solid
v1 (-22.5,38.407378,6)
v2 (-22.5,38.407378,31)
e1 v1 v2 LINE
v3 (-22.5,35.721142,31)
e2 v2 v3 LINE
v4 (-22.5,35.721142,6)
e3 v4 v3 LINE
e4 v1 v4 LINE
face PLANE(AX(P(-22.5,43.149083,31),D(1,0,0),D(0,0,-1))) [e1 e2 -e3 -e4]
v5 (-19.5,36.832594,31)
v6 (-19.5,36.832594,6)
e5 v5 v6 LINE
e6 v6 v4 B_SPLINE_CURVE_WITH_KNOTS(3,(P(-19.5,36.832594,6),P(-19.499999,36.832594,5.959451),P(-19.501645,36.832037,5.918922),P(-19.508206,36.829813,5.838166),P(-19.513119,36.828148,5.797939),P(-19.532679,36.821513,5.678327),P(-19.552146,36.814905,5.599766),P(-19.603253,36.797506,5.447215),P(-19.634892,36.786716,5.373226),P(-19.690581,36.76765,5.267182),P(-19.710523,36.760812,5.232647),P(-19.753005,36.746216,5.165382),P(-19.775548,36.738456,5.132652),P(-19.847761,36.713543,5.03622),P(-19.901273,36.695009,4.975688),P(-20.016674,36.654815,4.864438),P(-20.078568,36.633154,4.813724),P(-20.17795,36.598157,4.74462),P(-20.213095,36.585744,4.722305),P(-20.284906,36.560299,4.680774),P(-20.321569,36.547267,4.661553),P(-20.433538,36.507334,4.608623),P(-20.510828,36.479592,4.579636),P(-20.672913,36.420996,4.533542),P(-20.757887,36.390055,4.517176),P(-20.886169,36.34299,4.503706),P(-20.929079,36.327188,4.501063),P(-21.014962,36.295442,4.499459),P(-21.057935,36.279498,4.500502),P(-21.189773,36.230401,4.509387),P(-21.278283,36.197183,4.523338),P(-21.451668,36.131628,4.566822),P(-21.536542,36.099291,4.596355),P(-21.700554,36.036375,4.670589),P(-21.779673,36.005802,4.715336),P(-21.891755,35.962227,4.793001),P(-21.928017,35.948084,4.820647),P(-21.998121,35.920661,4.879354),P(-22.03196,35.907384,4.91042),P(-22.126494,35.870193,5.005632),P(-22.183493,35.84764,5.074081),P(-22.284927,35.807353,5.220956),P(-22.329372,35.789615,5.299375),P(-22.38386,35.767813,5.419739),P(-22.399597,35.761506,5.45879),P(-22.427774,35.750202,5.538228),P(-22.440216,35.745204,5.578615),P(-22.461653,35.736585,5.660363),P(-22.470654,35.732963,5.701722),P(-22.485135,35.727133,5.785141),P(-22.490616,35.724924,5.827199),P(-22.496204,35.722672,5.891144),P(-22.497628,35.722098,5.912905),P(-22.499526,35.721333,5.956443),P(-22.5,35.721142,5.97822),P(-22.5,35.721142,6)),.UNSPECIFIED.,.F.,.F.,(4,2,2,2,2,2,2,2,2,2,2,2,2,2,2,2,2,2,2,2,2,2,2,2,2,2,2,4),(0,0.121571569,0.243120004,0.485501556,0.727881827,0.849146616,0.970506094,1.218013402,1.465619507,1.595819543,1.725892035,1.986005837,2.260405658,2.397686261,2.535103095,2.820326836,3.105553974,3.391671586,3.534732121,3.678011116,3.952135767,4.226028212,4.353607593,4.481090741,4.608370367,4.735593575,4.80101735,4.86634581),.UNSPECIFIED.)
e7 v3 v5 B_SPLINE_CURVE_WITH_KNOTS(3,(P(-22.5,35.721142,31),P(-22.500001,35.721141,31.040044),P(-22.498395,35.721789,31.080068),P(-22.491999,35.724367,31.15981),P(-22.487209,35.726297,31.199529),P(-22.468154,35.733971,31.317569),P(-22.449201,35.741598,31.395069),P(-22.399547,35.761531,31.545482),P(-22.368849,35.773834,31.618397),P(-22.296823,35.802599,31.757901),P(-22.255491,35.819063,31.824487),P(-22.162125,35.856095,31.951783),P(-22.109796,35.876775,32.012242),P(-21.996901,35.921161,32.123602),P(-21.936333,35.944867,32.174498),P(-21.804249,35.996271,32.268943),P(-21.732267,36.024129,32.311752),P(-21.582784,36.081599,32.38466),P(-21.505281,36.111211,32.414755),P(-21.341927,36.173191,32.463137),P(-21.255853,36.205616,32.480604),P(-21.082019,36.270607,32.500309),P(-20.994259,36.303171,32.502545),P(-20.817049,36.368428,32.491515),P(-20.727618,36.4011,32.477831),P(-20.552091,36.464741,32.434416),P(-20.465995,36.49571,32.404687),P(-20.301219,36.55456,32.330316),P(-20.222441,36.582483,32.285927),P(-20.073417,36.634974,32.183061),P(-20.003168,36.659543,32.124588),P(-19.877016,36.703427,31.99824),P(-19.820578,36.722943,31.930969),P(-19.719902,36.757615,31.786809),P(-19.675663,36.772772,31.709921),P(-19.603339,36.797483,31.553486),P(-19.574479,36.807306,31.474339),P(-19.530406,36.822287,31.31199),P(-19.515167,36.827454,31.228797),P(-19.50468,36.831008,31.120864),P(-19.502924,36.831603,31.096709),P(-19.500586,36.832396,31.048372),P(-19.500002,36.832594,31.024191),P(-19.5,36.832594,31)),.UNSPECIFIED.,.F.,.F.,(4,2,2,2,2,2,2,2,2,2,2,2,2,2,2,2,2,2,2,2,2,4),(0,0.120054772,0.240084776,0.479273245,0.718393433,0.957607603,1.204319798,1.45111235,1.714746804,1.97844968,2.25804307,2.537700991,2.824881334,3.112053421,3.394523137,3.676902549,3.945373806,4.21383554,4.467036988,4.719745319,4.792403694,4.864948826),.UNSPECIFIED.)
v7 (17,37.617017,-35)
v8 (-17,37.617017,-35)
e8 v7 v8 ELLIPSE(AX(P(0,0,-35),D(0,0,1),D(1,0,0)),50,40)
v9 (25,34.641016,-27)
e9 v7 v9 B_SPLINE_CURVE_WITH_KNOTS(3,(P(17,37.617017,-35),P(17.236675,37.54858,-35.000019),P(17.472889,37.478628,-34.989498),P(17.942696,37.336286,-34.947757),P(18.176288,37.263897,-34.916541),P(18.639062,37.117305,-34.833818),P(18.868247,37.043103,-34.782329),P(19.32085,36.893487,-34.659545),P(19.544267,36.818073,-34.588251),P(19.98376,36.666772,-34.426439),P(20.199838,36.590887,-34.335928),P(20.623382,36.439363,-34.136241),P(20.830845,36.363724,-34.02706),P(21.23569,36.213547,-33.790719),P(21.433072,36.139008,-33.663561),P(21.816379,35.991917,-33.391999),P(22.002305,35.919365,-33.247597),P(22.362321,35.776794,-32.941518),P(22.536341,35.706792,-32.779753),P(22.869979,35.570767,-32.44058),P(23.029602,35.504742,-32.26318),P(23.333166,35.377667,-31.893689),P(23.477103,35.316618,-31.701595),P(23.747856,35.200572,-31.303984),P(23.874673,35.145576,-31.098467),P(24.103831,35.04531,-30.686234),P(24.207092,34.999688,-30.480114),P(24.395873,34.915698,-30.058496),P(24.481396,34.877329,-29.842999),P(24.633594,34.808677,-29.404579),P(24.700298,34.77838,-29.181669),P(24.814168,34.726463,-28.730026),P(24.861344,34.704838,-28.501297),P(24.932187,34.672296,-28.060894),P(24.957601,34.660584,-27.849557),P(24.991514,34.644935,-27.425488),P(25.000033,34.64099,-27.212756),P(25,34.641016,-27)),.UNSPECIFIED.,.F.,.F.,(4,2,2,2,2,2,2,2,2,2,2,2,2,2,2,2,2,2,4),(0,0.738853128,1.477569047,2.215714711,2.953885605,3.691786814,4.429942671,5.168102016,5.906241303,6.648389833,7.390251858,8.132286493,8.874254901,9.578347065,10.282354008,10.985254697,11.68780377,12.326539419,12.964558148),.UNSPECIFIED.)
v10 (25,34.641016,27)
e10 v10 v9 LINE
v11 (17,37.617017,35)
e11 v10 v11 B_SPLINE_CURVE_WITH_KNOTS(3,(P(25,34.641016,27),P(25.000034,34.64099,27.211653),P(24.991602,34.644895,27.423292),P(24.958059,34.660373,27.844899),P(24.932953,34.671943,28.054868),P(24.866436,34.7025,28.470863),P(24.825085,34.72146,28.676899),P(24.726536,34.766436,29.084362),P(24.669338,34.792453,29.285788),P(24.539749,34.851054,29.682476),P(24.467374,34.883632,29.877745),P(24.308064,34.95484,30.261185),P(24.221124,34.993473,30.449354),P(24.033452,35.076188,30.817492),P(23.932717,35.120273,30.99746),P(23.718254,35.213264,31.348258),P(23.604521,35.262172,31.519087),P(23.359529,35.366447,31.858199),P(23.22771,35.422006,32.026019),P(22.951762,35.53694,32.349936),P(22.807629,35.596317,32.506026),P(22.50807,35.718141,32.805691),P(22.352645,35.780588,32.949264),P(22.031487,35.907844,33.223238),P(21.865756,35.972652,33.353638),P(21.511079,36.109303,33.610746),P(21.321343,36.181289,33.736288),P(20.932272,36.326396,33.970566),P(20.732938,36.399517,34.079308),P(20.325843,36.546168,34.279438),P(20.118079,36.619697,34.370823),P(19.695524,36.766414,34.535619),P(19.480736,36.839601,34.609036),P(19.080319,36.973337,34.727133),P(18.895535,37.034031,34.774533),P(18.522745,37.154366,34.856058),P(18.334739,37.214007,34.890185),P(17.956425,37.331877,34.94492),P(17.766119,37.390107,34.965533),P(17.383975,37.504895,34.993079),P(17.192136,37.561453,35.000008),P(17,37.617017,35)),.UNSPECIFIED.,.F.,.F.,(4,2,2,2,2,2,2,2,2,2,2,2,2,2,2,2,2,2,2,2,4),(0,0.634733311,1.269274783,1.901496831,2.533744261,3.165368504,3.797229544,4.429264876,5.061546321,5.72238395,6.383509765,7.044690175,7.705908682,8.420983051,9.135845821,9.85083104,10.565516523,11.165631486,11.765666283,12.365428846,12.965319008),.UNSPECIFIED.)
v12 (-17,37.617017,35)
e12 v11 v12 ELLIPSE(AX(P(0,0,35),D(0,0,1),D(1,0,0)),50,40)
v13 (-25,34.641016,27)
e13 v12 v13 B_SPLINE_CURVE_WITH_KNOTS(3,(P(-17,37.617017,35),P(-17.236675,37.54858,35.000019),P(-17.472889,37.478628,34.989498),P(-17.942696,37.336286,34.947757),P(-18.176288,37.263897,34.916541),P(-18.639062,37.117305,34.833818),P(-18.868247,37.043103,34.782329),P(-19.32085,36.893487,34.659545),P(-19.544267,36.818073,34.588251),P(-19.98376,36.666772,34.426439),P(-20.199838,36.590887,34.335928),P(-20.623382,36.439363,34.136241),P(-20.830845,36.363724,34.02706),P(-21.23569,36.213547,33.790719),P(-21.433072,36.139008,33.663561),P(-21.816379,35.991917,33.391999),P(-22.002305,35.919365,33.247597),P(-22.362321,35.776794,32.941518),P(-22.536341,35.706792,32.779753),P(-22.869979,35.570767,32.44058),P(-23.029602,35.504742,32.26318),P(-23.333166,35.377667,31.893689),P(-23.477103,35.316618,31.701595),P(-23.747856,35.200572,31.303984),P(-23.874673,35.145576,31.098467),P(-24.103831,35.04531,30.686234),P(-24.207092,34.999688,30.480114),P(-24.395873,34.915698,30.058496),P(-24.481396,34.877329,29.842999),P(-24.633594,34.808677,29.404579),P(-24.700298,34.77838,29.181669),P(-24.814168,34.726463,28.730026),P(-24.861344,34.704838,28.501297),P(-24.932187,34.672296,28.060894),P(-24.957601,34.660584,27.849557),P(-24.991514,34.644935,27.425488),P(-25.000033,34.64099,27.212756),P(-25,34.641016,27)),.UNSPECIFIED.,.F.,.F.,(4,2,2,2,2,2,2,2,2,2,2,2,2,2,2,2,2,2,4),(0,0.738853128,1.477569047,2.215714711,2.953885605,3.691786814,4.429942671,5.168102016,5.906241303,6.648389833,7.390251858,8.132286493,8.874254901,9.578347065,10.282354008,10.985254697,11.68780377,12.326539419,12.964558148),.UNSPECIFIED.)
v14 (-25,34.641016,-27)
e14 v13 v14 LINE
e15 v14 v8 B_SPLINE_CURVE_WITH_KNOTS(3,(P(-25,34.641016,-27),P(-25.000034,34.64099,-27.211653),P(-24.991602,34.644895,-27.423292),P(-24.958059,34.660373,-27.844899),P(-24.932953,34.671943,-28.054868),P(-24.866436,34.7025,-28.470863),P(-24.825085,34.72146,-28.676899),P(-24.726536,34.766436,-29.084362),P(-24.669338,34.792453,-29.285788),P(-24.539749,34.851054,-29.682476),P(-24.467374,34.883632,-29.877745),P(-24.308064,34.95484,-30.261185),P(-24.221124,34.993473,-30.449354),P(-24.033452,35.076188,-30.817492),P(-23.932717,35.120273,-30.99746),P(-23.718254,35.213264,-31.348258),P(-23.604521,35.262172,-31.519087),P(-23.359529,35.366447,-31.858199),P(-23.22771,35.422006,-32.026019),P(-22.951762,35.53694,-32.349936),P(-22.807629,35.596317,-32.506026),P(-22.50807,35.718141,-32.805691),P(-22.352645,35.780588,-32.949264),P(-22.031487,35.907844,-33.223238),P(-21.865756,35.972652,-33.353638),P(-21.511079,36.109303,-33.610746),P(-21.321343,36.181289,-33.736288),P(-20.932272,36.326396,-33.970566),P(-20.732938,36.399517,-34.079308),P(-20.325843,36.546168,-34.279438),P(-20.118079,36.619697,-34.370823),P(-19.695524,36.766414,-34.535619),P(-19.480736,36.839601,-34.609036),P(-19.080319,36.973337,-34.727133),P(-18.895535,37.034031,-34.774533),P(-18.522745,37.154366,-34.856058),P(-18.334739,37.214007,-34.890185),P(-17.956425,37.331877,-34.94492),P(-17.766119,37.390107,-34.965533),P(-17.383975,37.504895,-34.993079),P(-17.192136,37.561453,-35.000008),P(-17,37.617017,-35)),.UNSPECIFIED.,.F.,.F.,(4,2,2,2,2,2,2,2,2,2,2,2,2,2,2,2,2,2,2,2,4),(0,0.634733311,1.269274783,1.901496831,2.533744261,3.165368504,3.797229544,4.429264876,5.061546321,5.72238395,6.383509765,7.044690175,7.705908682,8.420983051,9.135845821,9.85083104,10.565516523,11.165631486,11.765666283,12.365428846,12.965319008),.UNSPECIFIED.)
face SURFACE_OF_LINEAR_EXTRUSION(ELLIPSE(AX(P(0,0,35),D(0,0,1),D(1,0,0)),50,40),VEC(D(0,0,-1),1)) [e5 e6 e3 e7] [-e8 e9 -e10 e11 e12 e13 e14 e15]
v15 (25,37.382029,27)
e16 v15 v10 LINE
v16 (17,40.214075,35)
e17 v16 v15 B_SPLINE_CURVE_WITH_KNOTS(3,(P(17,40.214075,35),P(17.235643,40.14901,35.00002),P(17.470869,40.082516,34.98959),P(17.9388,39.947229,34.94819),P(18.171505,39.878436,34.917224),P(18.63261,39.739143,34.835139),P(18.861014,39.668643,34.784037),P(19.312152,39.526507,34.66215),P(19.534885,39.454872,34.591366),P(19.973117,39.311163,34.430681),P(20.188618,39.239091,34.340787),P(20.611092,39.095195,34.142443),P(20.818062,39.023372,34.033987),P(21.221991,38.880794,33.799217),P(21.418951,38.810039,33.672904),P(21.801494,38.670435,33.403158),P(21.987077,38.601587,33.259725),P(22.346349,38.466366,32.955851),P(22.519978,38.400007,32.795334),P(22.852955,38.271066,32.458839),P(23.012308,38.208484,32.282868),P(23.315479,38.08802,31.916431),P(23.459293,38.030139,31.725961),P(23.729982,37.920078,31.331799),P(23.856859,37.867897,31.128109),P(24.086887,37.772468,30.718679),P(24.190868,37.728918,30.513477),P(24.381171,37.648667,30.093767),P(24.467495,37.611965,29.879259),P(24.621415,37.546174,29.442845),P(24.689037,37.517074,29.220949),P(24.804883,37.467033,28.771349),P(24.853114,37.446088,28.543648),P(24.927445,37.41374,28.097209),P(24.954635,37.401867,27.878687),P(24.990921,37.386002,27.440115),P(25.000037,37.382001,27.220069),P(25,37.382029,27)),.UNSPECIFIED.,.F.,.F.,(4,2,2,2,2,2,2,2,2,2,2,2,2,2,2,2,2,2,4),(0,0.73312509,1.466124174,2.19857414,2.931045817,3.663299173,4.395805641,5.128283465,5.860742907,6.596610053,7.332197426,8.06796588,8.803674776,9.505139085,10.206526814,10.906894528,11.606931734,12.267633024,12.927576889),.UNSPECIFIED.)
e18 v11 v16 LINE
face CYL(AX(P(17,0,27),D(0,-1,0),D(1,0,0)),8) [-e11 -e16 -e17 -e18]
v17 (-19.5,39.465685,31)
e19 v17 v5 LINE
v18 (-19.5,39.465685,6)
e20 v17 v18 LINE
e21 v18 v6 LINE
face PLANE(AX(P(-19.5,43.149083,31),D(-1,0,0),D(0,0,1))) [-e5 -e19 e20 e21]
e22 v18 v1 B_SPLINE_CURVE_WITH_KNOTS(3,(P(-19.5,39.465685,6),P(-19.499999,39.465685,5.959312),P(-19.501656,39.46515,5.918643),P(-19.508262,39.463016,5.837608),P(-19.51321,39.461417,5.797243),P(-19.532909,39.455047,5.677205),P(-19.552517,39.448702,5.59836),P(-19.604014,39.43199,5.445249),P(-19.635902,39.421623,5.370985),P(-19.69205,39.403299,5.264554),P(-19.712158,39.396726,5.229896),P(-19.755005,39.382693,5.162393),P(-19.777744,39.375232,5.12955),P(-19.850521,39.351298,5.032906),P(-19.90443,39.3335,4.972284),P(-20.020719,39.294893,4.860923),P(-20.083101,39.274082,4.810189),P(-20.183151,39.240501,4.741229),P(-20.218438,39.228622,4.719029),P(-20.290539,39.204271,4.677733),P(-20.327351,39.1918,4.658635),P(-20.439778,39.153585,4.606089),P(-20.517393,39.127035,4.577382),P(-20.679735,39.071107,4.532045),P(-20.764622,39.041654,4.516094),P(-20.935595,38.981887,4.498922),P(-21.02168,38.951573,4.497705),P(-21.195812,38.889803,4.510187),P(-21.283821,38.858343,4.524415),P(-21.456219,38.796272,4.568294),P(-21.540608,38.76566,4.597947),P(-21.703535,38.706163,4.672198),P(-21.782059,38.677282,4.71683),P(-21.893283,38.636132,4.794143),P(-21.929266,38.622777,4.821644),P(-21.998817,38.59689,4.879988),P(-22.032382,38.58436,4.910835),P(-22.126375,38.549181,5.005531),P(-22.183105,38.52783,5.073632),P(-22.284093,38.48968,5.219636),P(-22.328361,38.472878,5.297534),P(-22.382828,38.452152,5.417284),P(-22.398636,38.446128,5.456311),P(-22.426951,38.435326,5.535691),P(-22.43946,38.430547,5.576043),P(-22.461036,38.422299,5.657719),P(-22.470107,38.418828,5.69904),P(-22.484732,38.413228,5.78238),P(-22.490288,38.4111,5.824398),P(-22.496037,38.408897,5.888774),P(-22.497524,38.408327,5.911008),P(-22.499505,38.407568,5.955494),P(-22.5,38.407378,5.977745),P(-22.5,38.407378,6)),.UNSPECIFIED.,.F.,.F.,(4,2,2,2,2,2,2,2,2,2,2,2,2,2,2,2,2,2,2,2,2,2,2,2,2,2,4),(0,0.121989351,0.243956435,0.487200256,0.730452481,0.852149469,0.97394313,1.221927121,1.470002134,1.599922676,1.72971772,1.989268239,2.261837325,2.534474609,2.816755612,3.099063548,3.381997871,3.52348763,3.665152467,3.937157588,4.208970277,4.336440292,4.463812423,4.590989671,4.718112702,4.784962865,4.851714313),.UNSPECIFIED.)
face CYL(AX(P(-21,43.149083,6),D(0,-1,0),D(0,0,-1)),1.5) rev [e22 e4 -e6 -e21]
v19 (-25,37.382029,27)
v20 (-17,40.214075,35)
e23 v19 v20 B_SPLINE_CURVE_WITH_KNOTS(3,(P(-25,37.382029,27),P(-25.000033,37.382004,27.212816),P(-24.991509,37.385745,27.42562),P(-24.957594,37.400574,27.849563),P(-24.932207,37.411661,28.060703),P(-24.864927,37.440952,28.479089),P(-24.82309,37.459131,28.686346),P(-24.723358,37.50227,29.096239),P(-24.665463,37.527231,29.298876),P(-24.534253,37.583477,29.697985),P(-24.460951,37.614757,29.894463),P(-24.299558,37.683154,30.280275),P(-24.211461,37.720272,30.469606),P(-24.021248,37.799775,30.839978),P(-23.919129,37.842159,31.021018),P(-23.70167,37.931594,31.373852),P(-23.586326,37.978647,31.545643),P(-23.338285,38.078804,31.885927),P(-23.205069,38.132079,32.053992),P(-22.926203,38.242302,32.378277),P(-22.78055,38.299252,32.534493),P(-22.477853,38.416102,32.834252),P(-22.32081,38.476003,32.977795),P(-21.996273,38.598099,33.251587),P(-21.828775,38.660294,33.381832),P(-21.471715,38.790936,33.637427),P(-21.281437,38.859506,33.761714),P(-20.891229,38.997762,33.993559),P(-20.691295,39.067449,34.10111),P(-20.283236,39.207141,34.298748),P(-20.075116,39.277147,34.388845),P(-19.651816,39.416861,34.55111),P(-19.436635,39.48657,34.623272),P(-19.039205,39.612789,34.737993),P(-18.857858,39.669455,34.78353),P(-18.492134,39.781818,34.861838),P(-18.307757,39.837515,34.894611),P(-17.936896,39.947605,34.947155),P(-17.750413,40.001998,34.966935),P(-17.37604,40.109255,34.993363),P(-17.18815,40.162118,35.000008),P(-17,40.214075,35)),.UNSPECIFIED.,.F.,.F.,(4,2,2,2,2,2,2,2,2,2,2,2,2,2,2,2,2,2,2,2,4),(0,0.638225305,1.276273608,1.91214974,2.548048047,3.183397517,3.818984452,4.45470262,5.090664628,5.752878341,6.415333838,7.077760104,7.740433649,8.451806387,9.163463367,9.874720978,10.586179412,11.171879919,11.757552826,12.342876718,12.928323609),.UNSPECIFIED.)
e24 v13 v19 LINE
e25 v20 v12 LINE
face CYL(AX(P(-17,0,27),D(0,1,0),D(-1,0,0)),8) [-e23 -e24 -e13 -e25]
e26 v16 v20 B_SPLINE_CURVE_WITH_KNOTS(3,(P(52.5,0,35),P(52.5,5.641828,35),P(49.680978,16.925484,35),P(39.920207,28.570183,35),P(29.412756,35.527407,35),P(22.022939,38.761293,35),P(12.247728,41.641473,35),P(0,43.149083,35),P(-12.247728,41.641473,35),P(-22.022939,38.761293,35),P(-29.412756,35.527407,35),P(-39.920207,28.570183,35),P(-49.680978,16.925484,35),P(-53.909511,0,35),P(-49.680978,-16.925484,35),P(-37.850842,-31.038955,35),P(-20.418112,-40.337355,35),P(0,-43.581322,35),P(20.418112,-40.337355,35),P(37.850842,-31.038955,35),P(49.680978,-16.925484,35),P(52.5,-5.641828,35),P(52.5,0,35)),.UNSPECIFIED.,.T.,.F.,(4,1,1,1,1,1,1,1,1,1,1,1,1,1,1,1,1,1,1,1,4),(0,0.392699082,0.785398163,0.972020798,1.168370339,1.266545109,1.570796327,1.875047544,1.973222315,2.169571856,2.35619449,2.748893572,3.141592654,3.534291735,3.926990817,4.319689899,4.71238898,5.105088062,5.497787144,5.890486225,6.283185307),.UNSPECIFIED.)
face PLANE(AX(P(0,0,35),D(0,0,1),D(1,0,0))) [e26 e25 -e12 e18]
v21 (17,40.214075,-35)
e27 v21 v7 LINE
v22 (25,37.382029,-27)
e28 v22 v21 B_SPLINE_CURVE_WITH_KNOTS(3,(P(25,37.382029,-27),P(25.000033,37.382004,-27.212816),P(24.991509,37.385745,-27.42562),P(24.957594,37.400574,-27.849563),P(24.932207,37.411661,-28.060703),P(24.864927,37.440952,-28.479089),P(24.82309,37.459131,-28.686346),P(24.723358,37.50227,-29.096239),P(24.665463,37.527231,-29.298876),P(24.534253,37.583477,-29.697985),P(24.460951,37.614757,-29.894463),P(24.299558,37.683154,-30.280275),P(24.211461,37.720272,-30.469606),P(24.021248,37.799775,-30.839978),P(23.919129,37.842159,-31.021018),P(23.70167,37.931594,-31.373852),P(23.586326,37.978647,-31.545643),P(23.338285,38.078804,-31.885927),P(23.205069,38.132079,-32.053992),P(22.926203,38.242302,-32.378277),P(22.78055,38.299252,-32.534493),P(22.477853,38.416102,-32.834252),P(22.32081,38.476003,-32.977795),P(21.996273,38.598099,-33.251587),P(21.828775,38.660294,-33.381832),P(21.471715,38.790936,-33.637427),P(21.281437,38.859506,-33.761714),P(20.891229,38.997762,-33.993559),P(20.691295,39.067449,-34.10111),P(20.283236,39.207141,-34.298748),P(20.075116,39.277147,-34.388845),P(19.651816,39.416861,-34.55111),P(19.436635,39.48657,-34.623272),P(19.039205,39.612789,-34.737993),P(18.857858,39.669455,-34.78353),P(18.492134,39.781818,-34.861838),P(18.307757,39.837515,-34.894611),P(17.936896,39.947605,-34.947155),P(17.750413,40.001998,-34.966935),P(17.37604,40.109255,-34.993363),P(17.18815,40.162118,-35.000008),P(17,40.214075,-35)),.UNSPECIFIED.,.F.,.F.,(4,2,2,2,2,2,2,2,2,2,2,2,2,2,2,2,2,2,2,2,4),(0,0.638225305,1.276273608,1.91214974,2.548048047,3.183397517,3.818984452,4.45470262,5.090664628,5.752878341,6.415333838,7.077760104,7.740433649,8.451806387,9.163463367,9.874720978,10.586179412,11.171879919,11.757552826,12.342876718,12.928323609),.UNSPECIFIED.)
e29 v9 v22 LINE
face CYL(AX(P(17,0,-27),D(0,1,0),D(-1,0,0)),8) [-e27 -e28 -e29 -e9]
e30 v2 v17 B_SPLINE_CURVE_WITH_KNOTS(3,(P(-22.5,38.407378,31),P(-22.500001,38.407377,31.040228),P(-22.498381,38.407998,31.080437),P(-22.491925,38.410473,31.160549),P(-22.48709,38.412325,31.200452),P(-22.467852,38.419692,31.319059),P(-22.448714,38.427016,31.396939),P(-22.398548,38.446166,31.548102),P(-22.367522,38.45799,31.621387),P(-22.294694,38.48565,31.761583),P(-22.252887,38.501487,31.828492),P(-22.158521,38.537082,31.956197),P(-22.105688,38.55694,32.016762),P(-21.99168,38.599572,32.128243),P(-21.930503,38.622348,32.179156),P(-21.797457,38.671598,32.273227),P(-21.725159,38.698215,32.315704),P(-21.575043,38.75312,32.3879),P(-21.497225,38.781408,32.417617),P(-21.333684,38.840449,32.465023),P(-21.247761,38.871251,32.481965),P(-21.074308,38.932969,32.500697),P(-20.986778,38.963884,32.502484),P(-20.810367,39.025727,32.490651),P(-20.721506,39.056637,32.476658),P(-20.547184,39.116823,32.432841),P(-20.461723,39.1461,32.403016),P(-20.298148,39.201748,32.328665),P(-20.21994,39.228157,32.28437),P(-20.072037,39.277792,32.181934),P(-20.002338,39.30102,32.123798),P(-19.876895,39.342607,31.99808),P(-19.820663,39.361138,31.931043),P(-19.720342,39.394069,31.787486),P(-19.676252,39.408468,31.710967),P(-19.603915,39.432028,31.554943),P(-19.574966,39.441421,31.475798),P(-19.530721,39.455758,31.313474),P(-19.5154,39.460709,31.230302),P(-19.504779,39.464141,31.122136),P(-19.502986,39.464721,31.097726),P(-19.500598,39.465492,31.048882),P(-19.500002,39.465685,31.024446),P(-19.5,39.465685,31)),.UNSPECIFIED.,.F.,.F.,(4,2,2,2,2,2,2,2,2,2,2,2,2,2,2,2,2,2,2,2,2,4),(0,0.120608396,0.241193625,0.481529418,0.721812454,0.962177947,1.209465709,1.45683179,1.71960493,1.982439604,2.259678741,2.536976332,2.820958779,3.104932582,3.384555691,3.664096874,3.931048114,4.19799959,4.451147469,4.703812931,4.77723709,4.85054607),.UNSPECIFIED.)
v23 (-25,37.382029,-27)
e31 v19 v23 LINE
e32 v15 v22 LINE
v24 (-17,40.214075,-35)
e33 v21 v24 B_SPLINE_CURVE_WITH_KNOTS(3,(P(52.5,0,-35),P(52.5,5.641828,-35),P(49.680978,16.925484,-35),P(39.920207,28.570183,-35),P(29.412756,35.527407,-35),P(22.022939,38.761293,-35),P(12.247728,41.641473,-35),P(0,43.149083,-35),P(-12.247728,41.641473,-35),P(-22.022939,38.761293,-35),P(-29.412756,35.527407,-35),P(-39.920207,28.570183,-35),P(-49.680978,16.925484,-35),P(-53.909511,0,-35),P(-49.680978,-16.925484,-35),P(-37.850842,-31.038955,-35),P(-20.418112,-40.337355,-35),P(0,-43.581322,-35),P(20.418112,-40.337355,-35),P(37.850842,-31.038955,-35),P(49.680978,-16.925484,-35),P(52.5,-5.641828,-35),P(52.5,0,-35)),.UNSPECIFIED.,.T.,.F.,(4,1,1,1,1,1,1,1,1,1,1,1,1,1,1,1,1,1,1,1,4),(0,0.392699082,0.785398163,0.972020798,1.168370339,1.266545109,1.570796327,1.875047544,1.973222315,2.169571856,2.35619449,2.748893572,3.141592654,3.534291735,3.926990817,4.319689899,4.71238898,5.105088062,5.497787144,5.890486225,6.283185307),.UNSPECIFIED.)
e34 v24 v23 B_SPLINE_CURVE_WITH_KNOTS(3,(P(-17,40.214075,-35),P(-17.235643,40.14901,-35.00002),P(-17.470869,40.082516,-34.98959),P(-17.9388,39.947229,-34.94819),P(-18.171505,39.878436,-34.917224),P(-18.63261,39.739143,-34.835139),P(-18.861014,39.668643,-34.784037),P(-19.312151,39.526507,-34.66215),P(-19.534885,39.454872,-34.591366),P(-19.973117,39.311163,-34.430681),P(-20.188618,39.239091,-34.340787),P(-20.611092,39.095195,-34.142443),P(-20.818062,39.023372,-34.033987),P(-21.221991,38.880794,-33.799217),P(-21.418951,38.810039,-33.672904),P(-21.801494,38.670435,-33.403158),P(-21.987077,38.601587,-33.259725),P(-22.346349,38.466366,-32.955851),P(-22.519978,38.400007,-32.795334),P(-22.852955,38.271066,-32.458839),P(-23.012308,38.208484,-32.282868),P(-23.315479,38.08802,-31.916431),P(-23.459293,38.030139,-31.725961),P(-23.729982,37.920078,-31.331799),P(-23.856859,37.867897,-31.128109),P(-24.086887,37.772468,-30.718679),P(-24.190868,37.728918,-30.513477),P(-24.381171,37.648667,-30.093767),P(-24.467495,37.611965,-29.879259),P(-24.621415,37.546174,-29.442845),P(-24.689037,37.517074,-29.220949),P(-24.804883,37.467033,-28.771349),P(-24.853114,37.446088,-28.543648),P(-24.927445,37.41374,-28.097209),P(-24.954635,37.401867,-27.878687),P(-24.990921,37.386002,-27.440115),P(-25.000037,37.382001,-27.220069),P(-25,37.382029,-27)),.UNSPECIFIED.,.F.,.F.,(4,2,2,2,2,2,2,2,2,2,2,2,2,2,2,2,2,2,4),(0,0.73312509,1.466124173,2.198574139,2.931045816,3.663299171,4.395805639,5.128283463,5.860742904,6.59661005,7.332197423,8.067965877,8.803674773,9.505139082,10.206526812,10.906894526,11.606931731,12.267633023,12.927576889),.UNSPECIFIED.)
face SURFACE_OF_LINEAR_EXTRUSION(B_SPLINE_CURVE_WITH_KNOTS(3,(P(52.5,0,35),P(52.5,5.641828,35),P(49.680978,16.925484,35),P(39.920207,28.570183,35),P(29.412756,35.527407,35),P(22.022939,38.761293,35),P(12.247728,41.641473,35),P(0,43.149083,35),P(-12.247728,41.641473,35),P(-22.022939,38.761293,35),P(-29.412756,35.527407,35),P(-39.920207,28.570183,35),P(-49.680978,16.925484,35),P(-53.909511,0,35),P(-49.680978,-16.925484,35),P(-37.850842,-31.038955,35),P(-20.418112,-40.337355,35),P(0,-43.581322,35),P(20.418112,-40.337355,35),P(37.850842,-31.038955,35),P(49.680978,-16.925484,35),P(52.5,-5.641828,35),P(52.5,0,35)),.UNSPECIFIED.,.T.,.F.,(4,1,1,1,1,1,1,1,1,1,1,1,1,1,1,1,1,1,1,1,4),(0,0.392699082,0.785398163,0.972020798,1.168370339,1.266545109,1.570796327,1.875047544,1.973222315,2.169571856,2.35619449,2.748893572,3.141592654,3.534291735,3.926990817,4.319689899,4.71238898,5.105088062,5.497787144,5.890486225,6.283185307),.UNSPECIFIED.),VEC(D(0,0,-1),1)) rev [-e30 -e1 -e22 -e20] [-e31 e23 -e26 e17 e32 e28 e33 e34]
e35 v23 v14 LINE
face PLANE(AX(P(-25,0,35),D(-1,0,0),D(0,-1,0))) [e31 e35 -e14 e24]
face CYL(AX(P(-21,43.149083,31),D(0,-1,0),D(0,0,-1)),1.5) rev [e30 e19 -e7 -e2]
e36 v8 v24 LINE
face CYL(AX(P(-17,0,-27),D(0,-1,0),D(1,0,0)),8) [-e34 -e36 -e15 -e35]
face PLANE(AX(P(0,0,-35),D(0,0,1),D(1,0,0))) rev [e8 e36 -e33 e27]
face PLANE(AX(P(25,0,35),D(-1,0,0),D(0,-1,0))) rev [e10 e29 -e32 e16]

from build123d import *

# Parameters (mm, degrees)
BOSS_EXTRUDE1_START = -35
BOSS_EXTRUDE1_DEPTH = 70
CUT_EXTRUDE1_DEPTH  = 61.466933282
FILLET1_R           = 8


# Read off the part's stored shape, not the designer's step: Boss-Extrude1
with BuildPart() as part:
    # Boss-Extrude1 outline → Boss-Extrude1 (new body)
    with BuildSketch(Plane.XY.offset(BOSS_EXTRUDE1_START)):
        with BuildLine():
            Line((25, 34.641016151), (25, 37.382028889))
            add(Edge.make_bspline(
                [(25, 37.382028889), (23.499149868, 38.038900322), (20.42020332, 39.233525172), (12.247727699, 41.641473317), (0, 43.149082804), (-12.247727699, 41.641473317), (-20.42020332, 39.233525172), (-23.499149868, 38.038900322), (-25, 37.382028889)],
                knots=[1.070195568, 1.070195568, 1.070195568, 1.070195568, 1.168370339, 1.266545109, 1.570796327, 1.875047544, 1.973222315, 2.071397085, 2.071397085, 2.071397085, 2.071397085], degree=3))
            Line((-25, 37.382028889), (-25, 34.641016151))
            add(Edge.make_bspline(
                [(25, 34.641016151), (0, 46.188021535), (-25, 34.641016151)],
                knots=[1.047197551, 1.047197551, 1.047197551, 2.094395102, 2.094395102, 2.094395102], degree=2, weights=[1, 0.866025404, 1]))
        make_face()
    extrude(amount=BOSS_EXTRUDE1_DEPTH)

    # Sketch5 → Cut-Extrude1 (cut, through all)
    with BuildSketch(Plane(origin=(0, 0, 0), x_dir=(1, 0, 0), z_dir=(0, 1, 0))):
        with BuildLine():
            Line((-22.5, -31), (-22.5, -6))
            ThreePointArc((-22.5, -6), (-21, -4.5), (-19.5, -6))
            Line((-19.5, -6), (-19.5, -31))
            ThreePointArc((-19.5, -31), (-21, -32.5), (-22.5, -31))
        make_face()
    extrude(amount=CUT_EXTRUDE1_DEPTH, mode=Mode.SUBTRACT)

    # Fillet1
    # the kernel refuses this fillet: 8 mm, written as the material it takes off along each edge
    with BuildSketch(Plane(origin=(-25, 57.382028889, -35), x_dir=(0, 0, 1), z_dir=(0, -1, 0)), Plane(origin=(-25, 57.382028889, 35), x_dir=(1, 0, 0), z_dir=(0, -1, 0)), Plane(origin=(25, 14.641016151, -35), x_dir=(0, 0, 1), z_dir=(0, 1, 0))) as fillet1_piece_1:
        with BuildLine():
            CenterArc((FILLET1_R, -FILLET1_R), FILLET1_R, 90, 90)
            Line((0, -FILLET1_R), (0, 0))
            Line((0, 0), (FILLET1_R, 0))
        make_face()
    extrude(amount=42.741012738, mode=Mode.SUBTRACT)
    with BuildSketch(Plane(origin=(25, 14.641016151, 35), x_dir=(0, 0, -1), z_dir=(0, 1, 0))) as fillet1_piece_2:
        with BuildLine():
            CenterArc((FILLET1_R, FILLET1_R), FILLET1_R, 180, 90)
            Line((0, FILLET1_R), (0, 0))
            Line((0, 0), (FILLET1_R, 0))
        make_face()
    extrude(amount=42.741012738, mode=Mode.SUBTRACT)


solid = part.part
